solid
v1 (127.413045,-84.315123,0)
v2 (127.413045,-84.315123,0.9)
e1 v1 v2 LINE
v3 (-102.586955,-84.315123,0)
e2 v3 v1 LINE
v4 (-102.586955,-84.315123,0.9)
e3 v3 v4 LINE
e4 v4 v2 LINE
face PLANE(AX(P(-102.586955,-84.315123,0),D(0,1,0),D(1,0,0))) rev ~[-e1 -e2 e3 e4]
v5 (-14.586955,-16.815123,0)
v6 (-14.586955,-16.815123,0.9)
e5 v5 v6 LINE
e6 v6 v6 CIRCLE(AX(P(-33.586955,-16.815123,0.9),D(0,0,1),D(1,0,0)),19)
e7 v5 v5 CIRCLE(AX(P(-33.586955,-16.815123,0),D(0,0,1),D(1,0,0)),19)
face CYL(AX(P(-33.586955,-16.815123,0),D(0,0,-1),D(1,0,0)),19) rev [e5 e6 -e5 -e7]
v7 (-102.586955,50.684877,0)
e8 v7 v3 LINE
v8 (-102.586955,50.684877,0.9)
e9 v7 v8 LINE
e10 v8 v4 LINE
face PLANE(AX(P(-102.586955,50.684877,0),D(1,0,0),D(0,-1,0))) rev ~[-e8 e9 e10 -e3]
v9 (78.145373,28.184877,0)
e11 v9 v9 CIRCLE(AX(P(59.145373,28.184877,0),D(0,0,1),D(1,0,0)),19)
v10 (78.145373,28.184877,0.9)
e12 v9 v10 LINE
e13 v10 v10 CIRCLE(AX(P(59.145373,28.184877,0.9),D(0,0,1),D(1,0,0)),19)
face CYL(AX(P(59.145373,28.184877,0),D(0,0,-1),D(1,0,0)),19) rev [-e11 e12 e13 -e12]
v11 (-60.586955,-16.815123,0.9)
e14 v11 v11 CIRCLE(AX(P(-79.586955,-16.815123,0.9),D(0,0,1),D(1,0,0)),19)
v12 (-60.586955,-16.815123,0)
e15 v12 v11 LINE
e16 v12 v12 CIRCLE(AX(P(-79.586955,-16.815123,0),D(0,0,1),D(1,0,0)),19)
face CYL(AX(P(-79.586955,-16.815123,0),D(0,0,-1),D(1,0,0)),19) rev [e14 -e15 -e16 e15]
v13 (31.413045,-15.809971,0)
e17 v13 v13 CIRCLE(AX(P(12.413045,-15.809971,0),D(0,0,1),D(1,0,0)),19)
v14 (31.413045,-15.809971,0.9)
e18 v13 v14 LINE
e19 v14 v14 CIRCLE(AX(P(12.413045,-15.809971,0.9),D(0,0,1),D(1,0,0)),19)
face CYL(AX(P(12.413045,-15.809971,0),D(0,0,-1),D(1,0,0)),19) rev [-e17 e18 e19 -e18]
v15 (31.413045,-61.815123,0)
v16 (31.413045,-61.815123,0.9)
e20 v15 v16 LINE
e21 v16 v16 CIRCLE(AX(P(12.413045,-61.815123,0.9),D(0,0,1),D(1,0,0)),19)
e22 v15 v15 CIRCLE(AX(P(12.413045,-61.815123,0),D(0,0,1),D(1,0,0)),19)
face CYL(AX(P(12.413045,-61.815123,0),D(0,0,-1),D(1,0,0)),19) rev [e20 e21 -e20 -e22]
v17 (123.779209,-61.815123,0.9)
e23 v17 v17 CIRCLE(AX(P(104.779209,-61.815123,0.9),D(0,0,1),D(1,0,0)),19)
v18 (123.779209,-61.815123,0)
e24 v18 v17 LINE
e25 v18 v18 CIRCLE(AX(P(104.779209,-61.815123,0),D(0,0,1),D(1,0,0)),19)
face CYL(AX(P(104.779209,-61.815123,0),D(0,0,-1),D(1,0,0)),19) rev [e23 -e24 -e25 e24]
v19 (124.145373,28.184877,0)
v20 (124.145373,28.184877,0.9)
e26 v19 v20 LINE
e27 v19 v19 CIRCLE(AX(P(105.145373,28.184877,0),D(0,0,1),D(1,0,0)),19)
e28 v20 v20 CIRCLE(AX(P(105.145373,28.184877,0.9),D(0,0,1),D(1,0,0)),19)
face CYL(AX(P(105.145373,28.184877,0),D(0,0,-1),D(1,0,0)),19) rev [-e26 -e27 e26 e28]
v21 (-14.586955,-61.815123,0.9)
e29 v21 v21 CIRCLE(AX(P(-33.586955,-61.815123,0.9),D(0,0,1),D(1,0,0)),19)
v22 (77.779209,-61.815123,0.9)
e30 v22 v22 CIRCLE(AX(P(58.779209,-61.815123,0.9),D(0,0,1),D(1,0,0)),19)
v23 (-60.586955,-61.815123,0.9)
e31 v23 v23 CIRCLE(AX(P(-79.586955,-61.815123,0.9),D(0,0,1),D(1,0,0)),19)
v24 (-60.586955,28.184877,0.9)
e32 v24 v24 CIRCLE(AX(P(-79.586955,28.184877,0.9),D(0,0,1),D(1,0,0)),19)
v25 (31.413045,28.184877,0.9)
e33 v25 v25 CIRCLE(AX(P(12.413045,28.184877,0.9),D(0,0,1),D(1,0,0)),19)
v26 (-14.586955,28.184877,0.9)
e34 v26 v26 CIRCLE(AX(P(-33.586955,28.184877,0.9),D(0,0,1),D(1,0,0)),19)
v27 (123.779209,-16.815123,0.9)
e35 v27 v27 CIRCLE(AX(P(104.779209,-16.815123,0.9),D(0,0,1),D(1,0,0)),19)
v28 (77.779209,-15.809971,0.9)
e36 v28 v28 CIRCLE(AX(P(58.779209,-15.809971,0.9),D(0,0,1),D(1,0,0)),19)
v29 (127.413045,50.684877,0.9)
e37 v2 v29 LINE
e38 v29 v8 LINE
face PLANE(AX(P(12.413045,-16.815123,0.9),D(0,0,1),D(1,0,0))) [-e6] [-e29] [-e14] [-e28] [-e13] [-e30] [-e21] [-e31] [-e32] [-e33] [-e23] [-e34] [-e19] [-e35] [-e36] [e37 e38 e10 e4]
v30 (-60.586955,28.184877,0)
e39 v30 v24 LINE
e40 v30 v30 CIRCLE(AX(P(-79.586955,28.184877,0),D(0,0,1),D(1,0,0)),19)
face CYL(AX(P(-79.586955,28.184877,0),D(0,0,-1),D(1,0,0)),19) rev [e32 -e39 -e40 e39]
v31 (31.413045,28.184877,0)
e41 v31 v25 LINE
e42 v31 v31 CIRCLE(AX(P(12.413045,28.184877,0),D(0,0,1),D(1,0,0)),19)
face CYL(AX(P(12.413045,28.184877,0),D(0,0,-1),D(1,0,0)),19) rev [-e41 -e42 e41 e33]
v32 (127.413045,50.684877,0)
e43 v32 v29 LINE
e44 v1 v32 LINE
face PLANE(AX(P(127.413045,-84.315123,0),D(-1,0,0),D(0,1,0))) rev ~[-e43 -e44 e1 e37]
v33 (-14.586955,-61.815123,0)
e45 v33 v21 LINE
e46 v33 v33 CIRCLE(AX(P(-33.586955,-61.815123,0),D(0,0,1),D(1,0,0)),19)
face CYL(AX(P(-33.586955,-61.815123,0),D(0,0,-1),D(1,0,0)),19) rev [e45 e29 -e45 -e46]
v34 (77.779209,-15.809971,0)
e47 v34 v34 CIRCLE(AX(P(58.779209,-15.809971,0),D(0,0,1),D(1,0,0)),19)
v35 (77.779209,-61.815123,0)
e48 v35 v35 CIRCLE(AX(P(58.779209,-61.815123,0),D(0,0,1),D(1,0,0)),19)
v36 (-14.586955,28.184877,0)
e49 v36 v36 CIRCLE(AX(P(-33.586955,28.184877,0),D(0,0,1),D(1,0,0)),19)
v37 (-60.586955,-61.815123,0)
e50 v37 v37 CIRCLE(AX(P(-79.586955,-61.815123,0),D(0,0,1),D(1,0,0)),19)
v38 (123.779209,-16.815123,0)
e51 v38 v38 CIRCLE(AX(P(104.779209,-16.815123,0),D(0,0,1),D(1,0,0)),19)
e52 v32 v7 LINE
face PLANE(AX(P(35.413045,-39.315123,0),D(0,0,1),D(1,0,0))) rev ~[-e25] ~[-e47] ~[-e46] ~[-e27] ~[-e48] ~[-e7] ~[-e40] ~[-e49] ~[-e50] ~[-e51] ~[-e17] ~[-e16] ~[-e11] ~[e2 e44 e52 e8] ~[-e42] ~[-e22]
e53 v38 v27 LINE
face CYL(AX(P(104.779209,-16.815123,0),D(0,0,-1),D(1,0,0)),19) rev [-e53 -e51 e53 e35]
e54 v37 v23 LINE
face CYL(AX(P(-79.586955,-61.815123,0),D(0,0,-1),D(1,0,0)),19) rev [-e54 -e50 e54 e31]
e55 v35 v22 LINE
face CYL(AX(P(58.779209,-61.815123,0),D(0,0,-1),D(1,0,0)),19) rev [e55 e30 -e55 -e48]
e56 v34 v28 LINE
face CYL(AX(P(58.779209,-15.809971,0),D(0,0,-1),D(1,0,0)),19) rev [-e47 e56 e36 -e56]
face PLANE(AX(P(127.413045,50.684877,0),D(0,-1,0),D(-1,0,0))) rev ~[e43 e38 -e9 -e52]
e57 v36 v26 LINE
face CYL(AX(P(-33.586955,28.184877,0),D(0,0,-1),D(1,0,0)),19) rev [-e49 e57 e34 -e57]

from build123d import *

# Parameters (mm, degrees)
F0_R     = 19
F0_R_2   = 2.5
F1_DEPTH = 0.9
F3_DEPTH = 0.9


# Not quite as in the source:
# - the program builds the solid bodies; features that only make, move or delete a surface that nothing else refers to are left out


with BuildPart() as f1:
    # F0 (on Top) → F1 (new body)
    with BuildSketch(Plane.XY):
        Polygon((127.4130453914, 50.6848765003), (-102.5869546086, 50.6848765003), (-102.5869546086, 5.6848765003), (-102.5869546086, -39.3151234997), (-102.5869546086, -84.3151234997), (-56.5869546086, -84.3151234997), (-10.5869546086, -84.3151234997), (35.4130453914, -84.3151234997), (81.4130453914, -84.3151234997), (127.4130453914, -84.3151234997), align=None)
        with Locations((-79.5869546086, -61.8151234997)):
            Circle(F0_R, mode=Mode.SUBTRACT)
        with Locations((-33.5869546086, -61.8151234997)):
            Circle(F0_R, mode=Mode.SUBTRACT)
        with Locations((12.4130453914, -61.8151234997)):
            Circle(F0_R, mode=Mode.SUBTRACT)
        with Locations((-56.5869546086, -39.3151234997)):
            Circle(F0_R_2, mode=Mode.SUBTRACT)
        with Locations((-10.5869546086, -39.3151234997)):
            Circle(F0_R_2, mode=Mode.SUBTRACT)
        with Locations((58.7792091643, -61.8151234997)):
            Circle(F0_R, mode=Mode.SUBTRACT)
        with Locations((104.7792091643, -61.8151234997)):
            Circle(F0_R, mode=Mode.SUBTRACT)
        with Locations((35.4130453914, -39.3151234997)):
            Circle(F0_R_2, mode=Mode.SUBTRACT)
        with Locations((81.4130453914, -39.3151234997)):
            Circle(F0_R_2, mode=Mode.SUBTRACT)
        with Locations((-79.5869546086, -16.8151234997)):
            Circle(F0_R, mode=Mode.SUBTRACT)
        with Locations((-56.5869546086, 5.6848765003)):
            Circle(F0_R_2, mode=Mode.SUBTRACT)
        with Locations((-33.5869546086, -16.8151234997)):
            Circle(F0_R, mode=Mode.SUBTRACT)
        with Locations((12.4130453914, -15.8099713178)):
            Circle(F0_R, mode=Mode.SUBTRACT)
        with Locations((-10.5869546086, 5.6848765003)):
            Circle(F0_R_2, mode=Mode.SUBTRACT)
        with Locations((-79.5869546086, 28.1848765003)):
            Circle(F0_R, mode=Mode.SUBTRACT)
        with Locations((-33.5869546086, 28.1848765003)):
            Circle(F0_R, mode=Mode.SUBTRACT)
        with Locations((12.4130453914, 28.1848765003)):
            Circle(F0_R, mode=Mode.SUBTRACT)
        with Locations((58.7792091643, -15.8099713178)):
            Circle(F0_R, mode=Mode.SUBTRACT)
        with Locations((35.4130453914, 5.6848765003)):
            Circle(F0_R_2, mode=Mode.SUBTRACT)
        with Locations((104.7792091643, -16.8151234997)):
            Circle(F0_R, mode=Mode.SUBTRACT)
        with Locations((81.4130453914, 5.6848765003)):
            Circle(F0_R_2, mode=Mode.SUBTRACT)
        with Locations((59.1453729371, 28.1848765003)):
            Circle(F0_R, mode=Mode.SUBTRACT)
        with Locations((105.1453729371, 28.1848765003)):
            Circle(F0_R, mode=Mode.SUBTRACT)
    extrude(amount=F1_DEPTH)

    # F0 (on Top) → F3 (join)
    with BuildSketch(Plane.XY):
        with Locations((35.4130453914, -39.3151234997)):
            Circle(F0_R_2)
        with Locations((81.4130453914, -39.3151234997)):
            Circle(F0_R_2)
        with Locations((81.4130453914, 5.6848765003)):
            Circle(F0_R_2)
        with Locations((35.4130453914, 5.6848765003)):
            Circle(F0_R_2)
        with Locations((-10.5869546086, 5.6848765003)):
            Circle(F0_R_2)
        with Locations((-56.5869546086, 5.6848765003)):
            Circle(F0_R_2)
        with Locations((-56.5869546086, -39.3151234997)):
            Circle(F0_R_2)
        with Locations((-10.5869546086, -39.3151234997)):
            Circle(F0_R_2)
    extrude(amount=F3_DEPTH)


solid = f1.part
